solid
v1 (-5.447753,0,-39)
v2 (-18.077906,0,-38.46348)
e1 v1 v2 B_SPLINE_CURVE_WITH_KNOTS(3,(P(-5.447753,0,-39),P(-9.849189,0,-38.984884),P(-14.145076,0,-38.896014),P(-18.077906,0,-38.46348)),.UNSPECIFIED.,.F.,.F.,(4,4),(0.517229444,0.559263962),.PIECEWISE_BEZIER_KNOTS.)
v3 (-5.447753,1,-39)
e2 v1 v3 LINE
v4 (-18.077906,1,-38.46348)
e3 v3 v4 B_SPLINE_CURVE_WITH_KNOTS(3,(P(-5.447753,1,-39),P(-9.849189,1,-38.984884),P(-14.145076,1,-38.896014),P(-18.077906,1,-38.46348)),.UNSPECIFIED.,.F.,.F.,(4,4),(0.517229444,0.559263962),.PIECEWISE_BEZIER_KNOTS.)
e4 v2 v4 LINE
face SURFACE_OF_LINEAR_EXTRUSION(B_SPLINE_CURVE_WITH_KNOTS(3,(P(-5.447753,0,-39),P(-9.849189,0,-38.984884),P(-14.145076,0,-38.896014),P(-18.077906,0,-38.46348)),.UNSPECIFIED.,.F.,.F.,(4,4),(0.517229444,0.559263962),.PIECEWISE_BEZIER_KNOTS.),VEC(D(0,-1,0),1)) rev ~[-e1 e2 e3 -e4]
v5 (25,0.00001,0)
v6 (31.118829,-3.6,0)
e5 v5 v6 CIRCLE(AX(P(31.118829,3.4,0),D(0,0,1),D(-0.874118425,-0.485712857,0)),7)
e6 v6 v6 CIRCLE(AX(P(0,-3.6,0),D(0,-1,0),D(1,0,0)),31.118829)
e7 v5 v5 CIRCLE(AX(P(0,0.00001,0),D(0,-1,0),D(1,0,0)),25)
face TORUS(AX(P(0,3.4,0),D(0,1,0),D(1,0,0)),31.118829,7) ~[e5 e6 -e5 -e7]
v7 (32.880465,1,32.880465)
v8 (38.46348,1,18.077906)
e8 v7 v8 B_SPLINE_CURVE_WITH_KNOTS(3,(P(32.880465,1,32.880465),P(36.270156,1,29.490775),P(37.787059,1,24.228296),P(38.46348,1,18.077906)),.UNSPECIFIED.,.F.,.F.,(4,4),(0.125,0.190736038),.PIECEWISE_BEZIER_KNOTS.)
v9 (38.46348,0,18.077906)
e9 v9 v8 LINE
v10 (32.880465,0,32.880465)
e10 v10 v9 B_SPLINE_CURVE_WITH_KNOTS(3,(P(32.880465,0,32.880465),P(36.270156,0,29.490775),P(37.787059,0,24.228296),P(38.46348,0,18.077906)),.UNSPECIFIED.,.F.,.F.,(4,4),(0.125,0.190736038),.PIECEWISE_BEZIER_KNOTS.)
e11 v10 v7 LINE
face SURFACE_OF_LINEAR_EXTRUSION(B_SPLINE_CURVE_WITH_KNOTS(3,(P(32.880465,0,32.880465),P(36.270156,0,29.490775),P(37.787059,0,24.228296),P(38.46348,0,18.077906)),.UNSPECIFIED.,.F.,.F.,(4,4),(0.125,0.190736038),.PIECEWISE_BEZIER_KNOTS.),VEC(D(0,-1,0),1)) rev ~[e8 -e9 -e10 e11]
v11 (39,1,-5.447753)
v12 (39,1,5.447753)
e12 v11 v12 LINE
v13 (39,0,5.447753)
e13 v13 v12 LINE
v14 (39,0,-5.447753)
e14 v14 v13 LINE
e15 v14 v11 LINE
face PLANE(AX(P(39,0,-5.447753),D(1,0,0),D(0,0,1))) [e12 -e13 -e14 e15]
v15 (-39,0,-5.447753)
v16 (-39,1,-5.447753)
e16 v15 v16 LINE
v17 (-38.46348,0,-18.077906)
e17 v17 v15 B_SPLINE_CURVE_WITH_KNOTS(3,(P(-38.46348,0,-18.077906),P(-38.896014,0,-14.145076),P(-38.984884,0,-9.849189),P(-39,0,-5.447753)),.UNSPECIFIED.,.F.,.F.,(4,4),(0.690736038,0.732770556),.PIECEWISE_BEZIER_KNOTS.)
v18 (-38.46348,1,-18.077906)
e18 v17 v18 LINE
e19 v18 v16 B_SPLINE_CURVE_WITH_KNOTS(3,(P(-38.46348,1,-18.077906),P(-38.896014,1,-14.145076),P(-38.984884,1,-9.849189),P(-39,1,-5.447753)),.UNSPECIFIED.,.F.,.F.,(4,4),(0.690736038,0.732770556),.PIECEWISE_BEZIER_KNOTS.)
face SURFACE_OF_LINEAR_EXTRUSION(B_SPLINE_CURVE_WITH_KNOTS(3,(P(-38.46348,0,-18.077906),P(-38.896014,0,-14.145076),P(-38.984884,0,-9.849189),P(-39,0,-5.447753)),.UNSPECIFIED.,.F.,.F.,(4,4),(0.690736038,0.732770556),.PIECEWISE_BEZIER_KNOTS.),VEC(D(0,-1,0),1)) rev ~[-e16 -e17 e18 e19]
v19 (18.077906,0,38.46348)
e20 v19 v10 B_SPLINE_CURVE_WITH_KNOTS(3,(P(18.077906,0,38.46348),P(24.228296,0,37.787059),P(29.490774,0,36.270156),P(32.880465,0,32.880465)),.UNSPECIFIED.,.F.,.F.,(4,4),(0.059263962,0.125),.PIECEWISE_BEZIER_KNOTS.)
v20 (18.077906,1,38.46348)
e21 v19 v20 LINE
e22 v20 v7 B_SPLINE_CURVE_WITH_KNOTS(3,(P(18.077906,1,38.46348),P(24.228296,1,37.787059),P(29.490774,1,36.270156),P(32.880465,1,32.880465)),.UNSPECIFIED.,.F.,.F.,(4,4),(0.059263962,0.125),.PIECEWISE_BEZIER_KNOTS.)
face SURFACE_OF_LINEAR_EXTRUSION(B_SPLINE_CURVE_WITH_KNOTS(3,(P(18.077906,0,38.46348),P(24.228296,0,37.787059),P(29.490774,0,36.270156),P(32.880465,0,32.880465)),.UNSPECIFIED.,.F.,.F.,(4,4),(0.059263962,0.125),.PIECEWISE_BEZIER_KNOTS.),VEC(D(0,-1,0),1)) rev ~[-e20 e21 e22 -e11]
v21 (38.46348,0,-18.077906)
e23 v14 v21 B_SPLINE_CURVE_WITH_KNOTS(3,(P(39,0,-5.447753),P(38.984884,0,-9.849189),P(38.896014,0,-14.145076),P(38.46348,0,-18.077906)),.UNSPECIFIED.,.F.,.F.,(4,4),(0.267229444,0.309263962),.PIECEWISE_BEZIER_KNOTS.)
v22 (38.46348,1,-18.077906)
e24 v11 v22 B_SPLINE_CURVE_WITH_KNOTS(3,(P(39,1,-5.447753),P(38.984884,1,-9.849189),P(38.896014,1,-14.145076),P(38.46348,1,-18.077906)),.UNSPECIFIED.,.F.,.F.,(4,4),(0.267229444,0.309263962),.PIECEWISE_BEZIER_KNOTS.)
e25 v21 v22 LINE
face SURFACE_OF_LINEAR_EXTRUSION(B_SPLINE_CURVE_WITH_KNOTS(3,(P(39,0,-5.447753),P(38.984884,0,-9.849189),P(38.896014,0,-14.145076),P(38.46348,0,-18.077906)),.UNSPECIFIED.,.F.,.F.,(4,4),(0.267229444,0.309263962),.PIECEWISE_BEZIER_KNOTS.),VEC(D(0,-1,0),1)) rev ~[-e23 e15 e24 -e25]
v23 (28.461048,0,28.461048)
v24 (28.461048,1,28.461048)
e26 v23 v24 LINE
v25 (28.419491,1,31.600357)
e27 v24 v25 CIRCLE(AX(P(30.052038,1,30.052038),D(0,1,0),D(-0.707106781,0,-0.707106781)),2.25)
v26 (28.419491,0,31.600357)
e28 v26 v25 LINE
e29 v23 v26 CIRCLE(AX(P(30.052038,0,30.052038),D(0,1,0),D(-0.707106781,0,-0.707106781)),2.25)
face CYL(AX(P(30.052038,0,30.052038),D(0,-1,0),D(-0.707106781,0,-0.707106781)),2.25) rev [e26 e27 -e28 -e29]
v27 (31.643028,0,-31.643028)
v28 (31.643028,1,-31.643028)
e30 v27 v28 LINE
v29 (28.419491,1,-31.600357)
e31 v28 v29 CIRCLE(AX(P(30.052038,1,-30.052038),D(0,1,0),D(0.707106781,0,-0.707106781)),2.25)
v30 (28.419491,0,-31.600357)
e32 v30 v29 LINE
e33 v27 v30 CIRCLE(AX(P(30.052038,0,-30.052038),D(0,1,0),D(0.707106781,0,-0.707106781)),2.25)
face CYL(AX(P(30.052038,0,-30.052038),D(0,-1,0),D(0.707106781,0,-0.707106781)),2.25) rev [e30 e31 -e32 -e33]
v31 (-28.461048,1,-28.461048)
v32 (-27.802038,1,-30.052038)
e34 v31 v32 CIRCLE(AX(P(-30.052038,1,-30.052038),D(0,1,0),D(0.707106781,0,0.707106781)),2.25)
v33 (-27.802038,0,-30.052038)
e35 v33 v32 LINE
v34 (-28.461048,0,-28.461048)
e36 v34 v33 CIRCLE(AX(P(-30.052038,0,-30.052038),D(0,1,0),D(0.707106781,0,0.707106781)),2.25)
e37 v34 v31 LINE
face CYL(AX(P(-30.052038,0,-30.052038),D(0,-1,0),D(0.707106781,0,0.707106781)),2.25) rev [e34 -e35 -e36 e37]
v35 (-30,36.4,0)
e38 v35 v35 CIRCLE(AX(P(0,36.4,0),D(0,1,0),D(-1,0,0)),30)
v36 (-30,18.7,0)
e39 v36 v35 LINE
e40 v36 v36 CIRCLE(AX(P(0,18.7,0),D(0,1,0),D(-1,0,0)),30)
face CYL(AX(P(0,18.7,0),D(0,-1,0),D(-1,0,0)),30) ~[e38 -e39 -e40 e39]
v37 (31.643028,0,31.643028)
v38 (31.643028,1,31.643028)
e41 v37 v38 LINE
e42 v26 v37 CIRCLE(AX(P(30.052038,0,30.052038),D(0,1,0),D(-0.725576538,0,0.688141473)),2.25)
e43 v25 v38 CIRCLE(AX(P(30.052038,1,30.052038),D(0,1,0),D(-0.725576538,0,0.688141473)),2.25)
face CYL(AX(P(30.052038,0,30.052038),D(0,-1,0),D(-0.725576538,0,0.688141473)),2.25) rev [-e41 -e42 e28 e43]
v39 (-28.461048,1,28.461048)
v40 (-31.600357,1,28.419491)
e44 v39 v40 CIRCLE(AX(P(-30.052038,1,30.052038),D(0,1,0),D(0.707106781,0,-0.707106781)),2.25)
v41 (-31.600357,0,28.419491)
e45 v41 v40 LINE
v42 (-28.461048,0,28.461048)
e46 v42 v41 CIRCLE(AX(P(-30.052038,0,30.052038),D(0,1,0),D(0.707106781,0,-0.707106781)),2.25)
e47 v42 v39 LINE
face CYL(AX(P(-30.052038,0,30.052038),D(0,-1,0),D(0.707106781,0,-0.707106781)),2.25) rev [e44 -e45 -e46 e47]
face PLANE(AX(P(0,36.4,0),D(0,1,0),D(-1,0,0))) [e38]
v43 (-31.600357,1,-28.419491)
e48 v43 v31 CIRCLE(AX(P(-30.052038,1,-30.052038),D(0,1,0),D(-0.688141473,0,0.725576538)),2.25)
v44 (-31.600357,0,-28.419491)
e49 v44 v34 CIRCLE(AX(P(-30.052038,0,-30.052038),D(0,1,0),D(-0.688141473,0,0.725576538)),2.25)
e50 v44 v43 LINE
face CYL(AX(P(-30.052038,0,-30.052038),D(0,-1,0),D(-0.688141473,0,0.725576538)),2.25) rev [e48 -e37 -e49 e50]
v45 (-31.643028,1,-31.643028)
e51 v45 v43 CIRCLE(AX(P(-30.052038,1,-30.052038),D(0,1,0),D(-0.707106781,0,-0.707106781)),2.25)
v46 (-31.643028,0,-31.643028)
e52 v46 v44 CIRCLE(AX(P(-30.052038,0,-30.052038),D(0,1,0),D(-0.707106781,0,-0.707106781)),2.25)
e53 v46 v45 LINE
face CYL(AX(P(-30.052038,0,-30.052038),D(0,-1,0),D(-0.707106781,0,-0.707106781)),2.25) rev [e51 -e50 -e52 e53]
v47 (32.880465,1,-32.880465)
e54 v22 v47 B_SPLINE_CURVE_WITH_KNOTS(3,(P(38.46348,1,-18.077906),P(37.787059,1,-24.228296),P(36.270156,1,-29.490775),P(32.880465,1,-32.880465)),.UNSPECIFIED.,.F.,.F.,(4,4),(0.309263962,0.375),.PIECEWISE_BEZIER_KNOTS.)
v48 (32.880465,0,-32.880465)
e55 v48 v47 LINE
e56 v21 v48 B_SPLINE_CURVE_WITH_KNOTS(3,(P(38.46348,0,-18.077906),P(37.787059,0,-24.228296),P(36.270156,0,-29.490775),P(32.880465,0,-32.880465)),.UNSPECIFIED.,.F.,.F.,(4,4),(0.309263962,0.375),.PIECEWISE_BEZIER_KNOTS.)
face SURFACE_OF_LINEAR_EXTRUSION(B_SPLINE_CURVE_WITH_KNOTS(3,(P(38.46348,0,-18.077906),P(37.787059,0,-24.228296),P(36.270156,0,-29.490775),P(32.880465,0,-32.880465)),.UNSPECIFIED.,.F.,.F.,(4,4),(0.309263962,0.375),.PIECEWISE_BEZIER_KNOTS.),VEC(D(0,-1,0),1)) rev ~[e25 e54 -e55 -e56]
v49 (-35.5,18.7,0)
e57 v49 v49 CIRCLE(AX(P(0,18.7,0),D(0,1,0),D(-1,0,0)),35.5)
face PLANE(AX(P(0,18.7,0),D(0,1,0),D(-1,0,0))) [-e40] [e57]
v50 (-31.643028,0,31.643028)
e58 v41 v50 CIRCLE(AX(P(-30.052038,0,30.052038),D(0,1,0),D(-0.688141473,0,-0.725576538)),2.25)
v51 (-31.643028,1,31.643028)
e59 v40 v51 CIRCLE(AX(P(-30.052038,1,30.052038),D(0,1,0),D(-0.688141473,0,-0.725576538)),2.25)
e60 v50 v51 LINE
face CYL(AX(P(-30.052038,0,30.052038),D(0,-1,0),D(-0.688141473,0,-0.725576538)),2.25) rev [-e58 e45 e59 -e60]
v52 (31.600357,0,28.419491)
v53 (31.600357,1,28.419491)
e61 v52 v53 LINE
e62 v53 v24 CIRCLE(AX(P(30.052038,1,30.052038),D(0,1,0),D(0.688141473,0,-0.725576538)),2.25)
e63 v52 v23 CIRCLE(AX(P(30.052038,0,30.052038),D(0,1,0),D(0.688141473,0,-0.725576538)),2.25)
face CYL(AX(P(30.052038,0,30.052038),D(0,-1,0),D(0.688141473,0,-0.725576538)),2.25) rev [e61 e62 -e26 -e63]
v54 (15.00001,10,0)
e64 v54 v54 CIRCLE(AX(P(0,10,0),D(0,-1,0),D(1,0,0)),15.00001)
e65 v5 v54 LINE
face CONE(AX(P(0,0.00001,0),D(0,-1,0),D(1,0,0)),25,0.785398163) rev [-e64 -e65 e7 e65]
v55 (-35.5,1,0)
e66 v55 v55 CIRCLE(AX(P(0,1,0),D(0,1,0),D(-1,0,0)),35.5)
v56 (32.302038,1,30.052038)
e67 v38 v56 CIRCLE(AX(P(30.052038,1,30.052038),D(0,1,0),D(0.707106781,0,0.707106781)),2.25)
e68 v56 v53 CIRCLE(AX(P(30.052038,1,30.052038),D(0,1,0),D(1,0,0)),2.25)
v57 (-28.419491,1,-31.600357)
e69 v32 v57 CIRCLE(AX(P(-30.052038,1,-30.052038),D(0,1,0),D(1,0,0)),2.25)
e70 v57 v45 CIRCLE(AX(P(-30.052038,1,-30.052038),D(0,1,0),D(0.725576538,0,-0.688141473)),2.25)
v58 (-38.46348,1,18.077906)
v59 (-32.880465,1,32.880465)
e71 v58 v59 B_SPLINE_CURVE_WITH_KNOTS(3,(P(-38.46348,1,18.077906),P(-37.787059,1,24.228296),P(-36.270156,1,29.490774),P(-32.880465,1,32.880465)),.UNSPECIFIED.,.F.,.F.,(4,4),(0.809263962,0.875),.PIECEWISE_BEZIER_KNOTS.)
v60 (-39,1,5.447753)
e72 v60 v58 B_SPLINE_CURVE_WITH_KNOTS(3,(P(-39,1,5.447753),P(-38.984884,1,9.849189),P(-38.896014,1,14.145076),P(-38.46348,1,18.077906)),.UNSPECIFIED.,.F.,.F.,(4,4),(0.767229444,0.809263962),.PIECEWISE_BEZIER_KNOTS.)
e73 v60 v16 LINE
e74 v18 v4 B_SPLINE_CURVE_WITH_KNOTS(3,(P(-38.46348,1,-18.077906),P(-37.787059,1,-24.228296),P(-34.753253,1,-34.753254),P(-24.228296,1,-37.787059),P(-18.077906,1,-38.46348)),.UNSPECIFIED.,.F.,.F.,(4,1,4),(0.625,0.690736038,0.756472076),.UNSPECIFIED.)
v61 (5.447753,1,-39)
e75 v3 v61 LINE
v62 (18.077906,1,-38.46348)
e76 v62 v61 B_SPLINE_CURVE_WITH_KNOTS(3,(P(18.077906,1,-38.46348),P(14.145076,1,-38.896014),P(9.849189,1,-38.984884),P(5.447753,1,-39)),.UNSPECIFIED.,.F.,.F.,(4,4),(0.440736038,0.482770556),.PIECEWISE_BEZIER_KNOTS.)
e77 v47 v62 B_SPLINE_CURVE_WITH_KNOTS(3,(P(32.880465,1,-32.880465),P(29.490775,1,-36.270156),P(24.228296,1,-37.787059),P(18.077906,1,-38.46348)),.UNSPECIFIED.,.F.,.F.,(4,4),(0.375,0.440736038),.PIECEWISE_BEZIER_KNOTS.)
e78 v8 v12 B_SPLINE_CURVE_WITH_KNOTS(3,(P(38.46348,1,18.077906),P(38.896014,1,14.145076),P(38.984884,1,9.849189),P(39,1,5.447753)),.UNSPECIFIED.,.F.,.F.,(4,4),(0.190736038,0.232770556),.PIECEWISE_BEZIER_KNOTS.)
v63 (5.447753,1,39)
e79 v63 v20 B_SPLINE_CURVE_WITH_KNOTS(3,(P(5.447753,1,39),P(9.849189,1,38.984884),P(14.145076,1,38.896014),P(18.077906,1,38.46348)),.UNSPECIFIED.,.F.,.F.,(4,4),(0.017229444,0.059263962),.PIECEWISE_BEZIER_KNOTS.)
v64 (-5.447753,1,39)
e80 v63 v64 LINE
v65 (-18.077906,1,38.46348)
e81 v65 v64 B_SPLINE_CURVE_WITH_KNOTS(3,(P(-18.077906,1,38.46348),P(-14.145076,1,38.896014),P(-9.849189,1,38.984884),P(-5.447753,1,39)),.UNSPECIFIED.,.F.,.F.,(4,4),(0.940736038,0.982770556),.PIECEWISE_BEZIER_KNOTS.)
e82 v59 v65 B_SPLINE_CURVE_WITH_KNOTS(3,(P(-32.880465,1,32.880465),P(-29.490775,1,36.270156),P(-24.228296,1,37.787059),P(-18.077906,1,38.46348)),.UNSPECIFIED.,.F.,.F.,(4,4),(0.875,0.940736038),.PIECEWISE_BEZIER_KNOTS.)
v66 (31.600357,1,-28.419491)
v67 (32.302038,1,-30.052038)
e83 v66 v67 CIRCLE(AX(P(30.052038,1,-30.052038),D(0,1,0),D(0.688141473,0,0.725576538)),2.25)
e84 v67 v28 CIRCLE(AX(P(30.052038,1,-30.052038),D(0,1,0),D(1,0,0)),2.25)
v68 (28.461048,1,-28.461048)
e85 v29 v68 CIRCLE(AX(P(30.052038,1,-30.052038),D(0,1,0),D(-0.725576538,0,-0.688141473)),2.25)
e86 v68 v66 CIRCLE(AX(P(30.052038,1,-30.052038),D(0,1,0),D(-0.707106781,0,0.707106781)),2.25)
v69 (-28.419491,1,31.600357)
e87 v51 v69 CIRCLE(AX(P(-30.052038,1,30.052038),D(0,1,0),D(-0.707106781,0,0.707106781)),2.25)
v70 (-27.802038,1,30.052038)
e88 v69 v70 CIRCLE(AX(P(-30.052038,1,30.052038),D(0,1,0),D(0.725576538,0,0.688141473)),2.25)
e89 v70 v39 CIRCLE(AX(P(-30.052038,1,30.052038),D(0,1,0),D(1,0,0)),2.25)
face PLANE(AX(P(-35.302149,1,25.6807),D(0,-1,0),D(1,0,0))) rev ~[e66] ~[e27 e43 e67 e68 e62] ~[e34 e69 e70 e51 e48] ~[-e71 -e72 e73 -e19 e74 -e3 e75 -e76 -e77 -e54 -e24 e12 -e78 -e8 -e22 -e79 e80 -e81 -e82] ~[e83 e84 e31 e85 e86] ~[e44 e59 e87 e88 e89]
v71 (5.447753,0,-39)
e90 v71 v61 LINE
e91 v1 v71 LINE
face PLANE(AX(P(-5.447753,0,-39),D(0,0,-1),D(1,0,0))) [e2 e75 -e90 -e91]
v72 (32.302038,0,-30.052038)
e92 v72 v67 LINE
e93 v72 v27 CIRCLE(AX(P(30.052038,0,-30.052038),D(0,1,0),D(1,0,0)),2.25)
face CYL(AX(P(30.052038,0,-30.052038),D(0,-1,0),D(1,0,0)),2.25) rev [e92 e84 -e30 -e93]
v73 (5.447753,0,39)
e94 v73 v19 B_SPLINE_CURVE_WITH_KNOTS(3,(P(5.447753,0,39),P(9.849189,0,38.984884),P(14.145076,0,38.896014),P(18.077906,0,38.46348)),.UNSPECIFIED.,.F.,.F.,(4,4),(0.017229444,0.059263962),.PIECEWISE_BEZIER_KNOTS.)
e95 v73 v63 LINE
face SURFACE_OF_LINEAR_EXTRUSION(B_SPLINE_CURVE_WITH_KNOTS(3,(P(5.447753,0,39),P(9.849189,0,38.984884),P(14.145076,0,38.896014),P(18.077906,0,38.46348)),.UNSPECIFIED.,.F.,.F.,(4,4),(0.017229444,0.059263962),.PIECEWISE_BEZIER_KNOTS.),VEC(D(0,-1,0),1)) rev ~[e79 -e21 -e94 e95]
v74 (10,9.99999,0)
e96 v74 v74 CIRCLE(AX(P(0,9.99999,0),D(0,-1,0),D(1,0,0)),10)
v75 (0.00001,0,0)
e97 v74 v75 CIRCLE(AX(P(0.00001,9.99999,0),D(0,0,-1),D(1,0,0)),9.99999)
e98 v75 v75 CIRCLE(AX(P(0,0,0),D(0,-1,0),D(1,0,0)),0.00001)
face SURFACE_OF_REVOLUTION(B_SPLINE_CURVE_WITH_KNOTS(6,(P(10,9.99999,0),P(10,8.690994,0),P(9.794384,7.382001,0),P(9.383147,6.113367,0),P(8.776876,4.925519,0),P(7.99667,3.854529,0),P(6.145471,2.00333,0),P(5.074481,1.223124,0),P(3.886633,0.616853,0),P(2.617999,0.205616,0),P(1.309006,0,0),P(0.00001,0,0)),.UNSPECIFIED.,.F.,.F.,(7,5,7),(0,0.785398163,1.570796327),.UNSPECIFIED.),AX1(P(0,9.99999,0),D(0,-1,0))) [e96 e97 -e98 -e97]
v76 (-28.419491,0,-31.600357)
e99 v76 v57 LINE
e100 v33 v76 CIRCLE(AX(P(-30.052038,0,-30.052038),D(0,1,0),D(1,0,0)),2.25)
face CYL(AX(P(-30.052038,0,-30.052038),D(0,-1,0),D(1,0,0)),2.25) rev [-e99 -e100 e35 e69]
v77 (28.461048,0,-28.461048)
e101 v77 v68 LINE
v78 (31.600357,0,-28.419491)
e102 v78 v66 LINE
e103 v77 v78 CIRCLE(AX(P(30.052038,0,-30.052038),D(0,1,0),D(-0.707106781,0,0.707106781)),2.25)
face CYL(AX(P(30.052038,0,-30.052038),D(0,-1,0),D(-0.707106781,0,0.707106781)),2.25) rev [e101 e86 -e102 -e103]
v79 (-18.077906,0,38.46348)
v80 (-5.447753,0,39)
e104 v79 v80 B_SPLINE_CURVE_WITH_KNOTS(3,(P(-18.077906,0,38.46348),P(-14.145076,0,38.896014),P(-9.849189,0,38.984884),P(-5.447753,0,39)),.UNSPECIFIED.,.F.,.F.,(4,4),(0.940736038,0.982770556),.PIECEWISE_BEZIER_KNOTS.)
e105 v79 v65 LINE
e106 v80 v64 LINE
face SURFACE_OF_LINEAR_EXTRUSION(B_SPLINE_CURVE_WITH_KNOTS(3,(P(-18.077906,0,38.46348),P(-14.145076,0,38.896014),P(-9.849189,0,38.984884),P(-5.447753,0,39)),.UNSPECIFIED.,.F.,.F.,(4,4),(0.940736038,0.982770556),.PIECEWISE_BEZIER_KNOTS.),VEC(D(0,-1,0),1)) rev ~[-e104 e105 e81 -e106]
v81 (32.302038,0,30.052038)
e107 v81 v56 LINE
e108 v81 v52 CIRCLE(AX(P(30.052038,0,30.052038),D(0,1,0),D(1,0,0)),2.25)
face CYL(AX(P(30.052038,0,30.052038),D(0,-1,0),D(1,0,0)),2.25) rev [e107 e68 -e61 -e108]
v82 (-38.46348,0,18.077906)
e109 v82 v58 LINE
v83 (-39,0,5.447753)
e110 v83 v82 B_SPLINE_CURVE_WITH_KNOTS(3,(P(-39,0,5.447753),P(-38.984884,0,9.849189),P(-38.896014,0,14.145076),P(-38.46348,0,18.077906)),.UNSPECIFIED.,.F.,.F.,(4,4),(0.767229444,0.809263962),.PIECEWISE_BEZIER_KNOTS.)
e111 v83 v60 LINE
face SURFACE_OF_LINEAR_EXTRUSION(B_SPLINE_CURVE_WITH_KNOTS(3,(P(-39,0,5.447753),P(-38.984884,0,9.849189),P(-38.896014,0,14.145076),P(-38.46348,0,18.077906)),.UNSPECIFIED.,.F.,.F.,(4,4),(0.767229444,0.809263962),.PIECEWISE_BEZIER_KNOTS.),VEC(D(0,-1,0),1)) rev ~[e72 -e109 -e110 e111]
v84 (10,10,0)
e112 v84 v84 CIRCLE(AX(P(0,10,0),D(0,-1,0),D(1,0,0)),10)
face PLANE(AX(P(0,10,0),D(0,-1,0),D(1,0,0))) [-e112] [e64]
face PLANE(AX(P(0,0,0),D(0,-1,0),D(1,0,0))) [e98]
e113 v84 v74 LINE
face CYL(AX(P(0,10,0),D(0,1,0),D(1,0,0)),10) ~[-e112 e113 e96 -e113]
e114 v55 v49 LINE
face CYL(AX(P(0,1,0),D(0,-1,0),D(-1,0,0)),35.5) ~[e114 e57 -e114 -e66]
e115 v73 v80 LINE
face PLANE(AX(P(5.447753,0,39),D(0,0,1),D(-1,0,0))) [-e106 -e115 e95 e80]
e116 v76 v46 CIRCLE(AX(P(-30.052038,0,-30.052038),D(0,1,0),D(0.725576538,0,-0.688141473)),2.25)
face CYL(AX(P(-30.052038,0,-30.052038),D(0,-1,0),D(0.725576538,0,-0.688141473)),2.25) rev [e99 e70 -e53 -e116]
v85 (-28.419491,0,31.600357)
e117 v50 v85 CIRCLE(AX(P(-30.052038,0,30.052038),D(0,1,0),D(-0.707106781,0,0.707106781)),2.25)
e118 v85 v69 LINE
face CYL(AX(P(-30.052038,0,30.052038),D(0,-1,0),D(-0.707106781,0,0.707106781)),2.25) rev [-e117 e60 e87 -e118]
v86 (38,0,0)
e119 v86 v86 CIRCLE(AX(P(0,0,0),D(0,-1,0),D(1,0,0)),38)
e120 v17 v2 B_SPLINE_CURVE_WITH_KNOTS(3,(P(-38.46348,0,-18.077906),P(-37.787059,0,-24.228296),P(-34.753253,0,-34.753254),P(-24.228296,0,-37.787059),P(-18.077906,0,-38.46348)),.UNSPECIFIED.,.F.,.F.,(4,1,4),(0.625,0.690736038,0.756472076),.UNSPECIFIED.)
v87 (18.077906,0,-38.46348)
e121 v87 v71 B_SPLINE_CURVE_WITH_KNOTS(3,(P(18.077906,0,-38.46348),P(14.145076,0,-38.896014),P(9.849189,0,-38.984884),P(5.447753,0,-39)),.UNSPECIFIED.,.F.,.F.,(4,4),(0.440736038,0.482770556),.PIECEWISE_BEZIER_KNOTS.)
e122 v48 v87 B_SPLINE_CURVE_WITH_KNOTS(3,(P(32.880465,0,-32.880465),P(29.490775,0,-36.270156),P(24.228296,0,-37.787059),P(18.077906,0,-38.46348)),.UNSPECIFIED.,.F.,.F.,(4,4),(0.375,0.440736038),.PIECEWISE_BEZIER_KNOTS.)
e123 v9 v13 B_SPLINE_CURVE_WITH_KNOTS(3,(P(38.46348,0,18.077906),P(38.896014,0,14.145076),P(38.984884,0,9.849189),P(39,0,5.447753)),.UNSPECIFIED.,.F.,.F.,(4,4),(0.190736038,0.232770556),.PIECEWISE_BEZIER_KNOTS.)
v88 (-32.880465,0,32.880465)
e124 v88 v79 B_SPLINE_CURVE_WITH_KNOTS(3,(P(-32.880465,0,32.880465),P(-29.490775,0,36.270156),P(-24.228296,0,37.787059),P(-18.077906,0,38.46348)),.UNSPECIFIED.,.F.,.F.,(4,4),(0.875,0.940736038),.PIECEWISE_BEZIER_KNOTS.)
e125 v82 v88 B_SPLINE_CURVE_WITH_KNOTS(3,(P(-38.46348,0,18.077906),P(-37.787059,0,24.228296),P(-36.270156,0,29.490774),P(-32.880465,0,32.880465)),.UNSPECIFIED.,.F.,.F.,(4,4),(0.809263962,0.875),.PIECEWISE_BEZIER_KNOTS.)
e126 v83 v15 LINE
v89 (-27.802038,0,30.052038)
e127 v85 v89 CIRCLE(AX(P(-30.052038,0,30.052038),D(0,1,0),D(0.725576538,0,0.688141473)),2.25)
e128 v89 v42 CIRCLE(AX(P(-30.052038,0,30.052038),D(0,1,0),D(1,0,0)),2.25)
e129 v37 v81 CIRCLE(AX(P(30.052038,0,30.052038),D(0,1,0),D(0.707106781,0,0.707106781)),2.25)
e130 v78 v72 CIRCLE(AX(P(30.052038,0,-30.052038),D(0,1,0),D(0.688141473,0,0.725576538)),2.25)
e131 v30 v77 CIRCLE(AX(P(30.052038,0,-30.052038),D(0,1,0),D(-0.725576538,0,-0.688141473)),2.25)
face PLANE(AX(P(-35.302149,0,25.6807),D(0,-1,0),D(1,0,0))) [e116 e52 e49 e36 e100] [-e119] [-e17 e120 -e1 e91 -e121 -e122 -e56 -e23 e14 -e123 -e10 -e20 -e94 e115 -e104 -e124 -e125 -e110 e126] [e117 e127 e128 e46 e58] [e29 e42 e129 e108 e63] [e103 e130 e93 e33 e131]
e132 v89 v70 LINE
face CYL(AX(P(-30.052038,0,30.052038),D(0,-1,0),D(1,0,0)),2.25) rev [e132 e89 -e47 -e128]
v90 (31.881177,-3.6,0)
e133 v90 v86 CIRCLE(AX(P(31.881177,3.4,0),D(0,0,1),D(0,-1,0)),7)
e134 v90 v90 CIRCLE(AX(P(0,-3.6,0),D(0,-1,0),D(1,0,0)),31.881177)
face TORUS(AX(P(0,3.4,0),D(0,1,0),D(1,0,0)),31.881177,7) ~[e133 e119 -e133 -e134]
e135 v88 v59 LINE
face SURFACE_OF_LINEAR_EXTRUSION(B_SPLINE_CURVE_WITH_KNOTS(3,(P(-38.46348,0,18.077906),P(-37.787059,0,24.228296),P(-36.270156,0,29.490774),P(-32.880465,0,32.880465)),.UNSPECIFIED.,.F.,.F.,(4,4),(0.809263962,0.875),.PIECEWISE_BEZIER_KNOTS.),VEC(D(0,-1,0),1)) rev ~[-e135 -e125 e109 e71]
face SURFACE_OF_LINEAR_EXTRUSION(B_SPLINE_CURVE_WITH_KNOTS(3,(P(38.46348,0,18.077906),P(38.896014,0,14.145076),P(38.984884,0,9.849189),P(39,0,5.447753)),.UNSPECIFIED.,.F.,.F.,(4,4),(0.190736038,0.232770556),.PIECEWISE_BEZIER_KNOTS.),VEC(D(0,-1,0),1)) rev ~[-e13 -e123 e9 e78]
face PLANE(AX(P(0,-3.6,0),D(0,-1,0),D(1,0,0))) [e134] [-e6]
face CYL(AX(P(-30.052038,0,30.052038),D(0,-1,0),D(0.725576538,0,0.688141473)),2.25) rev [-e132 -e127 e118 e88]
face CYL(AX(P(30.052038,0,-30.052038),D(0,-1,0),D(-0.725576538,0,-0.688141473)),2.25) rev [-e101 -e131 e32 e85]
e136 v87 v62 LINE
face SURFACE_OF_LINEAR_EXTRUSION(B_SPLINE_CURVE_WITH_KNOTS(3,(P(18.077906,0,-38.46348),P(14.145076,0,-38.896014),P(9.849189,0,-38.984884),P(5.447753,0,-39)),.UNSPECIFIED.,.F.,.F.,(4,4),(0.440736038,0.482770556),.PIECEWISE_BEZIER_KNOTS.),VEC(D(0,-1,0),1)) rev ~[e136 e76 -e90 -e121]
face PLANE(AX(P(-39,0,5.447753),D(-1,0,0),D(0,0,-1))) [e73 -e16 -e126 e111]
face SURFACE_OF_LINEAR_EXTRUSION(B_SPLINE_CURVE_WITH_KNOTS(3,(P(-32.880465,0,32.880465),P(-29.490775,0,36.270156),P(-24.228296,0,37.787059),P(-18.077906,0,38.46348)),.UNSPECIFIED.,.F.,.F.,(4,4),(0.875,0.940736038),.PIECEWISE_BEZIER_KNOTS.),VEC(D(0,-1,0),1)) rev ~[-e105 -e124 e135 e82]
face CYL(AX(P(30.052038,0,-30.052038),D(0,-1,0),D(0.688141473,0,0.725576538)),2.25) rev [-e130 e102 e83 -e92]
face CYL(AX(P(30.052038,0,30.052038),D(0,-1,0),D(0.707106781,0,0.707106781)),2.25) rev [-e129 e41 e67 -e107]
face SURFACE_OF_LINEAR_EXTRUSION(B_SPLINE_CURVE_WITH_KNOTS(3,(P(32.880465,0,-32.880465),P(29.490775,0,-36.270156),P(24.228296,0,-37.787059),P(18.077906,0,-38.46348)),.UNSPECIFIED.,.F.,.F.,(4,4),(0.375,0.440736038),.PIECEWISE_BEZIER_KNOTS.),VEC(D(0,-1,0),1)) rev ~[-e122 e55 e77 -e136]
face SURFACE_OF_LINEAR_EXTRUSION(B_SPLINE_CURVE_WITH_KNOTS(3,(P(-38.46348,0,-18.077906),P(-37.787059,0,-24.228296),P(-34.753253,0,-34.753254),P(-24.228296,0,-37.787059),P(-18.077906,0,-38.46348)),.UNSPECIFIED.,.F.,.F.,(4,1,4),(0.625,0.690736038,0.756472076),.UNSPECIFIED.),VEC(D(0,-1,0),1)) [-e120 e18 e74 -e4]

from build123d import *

# Parameters (mm, degrees)
F1_DEPTH  = 1
F2_R      = 35.5
F3_DEPTH  = 17.7
F4_R      = 30
F5_DEPTH  = 17.7
F6_R      = 25
F7_DEPTH  = 10
F8_R      = 10
F9_DEPTH  = 10
F10_R     = 9.99999
F11_R     = 38
F11_R_2   = 25
F12_DEPTH = 3.6
F13_SIZE  = 9.99999


# Not quite as in the source:
# - a fillet or chamfer that OpenCascade refuses, or shapes differently, is made with other operations: its cross-section is extruded or revolved along the edge and cut away or added
# - a fillet or chamfer is up to 0.001 mm smaller than in the source, because OpenCascade refuses the exact size
# - ends of sketch curves that miss each other by under 0.0002 mm in the source are joined


with BuildPart() as f1:
    # F0 (on Front) → F1 (new body)
    with BuildSketch(Plane.XZ):
        with BuildLine():
            Line((-31.6430284581, 31.6430284581), (-32.8804653252, 32.8804653252))
            add(Edge.make_bspline(
                [(-38.4634802867, 18.0779059693), (-37.7870588122, 24.2282956212), (-36.2701561309, 29.4907744999), (-32.8804653607, 32.8804652897)],
                knots=[0.809263962, 0.809263962, 0.809263962, 0.809263962, 0.875, 0.875, 0.875, 0.875], degree=3))
            ThreePointArc((-38.4634802867, 18.0779059693), (-35.411472746, 23.5005871833), (-31.6003565153, 28.4194909895))
            ThreePointArc((-31.6003565153, 28.4194909895), (-32.3018410876, 30.0222561796), (-31.6430284581, 31.6430284581))
        make_face()
        with BuildLine():
            add(Edge.make_bspline(
                [(-32.8804653607, 32.8804652897), (-29.4907745634, 36.2701561065), (-24.2282956474, 37.7870588046), (-18.077905986, 38.4634802832)],
                knots=[0.875, 0.875, 0.875, 0.875, 0.940736038, 0.940736038, 0.940736038, 0.940736038], degree=3))
            Line((-32.8804653252, 32.8804653252), (-31.6430284581, 31.6430284581))
            ThreePointArc((-31.6430284581, 31.6430284581), (-30.0222561796, 32.3018410876), (-28.4194909895, 31.6003565153))
            ThreePointArc((-28.4194909895, 31.6003565153), (-23.5005871834, 35.411472746), (-18.0779059693, 38.4634802867))
        make_face()
        with BuildLine():
            add(Edge.make_bspline(
                [(-38.4634802867, -18.0779059693), (-38.8960139665, -14.1450759683), (-38.9848843926, -9.8491893154), (-39, -5.4477534527)],
                knots=[0.690736038, 0.690736038, 0.690736038, 0.690736038, 0.7327705557, 0.7327705557, 0.7327705557, 0.7327705557], degree=3))
            ThreePointArc((-38.4634802867, -18.0779059693), (-35.411472746, -23.5005871834), (-31.6003565153, -28.4194909895))
            ThreePointArc((-31.6003565153, -28.4194909895), (-30.0222561796, -27.8022353132), (-28.4610479428, -28.4610479428))
            Line((-28.4610479428, -28.4610479428), (0, 0))
            Line((0, 0), (-28.4610479428, 28.4610479428))
            ThreePointArc((-28.4610479428, 28.4610479428), (-30.0222561796, 27.8022353132), (-31.6003565153, 28.4194909895))
            ThreePointArc((-31.6003565153, 28.4194909895), (-35.411472746, 23.5005871833), (-38.4634802867, 18.0779059693))
            add(Edge.make_bspline(
                [(-39, 5.4477534527), (-38.9848843926, 9.8491893154), (-38.8960139665, 14.1450759683), (-38.4634802867, 18.0779059693)],
                knots=[0.7672294443, 0.7672294443, 0.7672294443, 0.7672294443, 0.809263962, 0.809263962, 0.809263962, 0.809263962], degree=3))
            Line((-39, 5.4477534527), (-39, -2.257e-07))
            Line((-39, -2.257e-07), (-39, -5.4477534527))
        make_face()
        with BuildLine():
            ThreePointArc((28.4194909895, 31.6003565153), (23.5005871834, 35.411472746), (18.0779059693, 38.4634802867))
            add(Edge.make_bspline(
                [(5.4477534527, 39), (9.8491893154, 38.9848843926), (14.1450759683, 38.8960139665), (18.0779059693, 38.4634802867)],
                knots=[0.0172294443, 0.0172294443, 0.0172294443, 0.0172294443, 0.059263962, 0.059263962, 0.059263962, 0.059263962], degree=3))
            Line((5.4477534527, 39), (0, 39))
            Line((0, 39), (-5.4477534527, 39))
            add(Edge.make_bspline(
                [(-18.0779059693, 38.4634802867), (-14.1450759684, 38.8960139665), (-9.8491893154, 38.9848843926), (-5.4477534527, 39)],
                knots=[0.940736038, 0.940736038, 0.940736038, 0.940736038, 0.9827705557, 0.9827705557, 0.9827705557, 0.9827705557], degree=3))
            ThreePointArc((-18.0779059693, 38.4634802867), (-23.5005871834, 35.411472746), (-28.4194909895, 31.6003565153))
            ThreePointArc((-28.4194909895, 31.6003565153), (-27.9620942748, 30.885485492), (-27.8020382004, 30.0520382004))
            ThreePointArc((-27.8020382004, 30.0520382004), (-27.9733092523, 29.1910004776), (-28.4610479428, 28.4610479428))
            Line((-28.4610479428, 28.4610479428), (0, 0))
            Line((0, 0), (28.4610479428, 28.4610479428))
            ThreePointArc((28.4610479428, 28.4610479428), (27.8022353132, 30.0222561796), (28.4194909895, 31.6003565153))
        make_face()
        with BuildLine():
            ThreePointArc((31.6003565153, -28.4194909895), (35.411472746, -23.5005871834), (38.4634802867, -18.0779059693))
            add(Edge.make_bspline(
                [(39, -5.4477534527), (38.9848843926, -9.8491893154), (38.8960139665, -14.1450759683), (38.4634802867, -18.0779059693)],
                knots=[0.2672294443, 0.2672294443, 0.2672294443, 0.2672294443, 0.309263962, 0.309263962, 0.309263962, 0.309263962], degree=3))
            Line((39, -5.4477534527), (39, 6.014e-07))
            Line((39, 6.014e-07), (39, 5.4477534527))
            add(Edge.make_bspline(
                [(38.4634802867, 18.0779059693), (38.8960139665, 14.1450759683), (38.9848843926, 9.8491893154), (39, 5.4477534527)],
                knots=[0.190736038, 0.190736038, 0.190736038, 0.190736038, 0.2327705557, 0.2327705557, 0.2327705557, 0.2327705557], degree=3))
            ThreePointArc((38.4634802867, 18.0779059693), (35.411472746, 23.5005871834), (31.6003565153, 28.4194909895))
            ThreePointArc((31.6003565153, 28.4194909895), (30.0222561796, 27.8022353132), (28.4610479428, 28.4610479428))
            Line((28.4610479428, 28.4610479428), (0, 0))
            Line((0, 0), (28.4610479428, -28.4610479428))
            ThreePointArc((28.4610479428, -28.4610479428), (30.0222561796, -27.8022353132), (31.6003565153, -28.4194909895))
        make_face()
        with BuildLine():
            add(Edge.make_bspline(
                [(18.0779059693, -38.4634802867), (14.1450759683, -38.8960139665), (9.8491893154, -38.9848843926), (5.4477534527, -39)],
                knots=[0.440736038, 0.440736038, 0.440736038, 0.440736038, 0.4827705557, 0.4827705557, 0.4827705557, 0.4827705557], degree=3))
            ThreePointArc((18.0779059693, -38.4634802867), (23.5005871834, -35.411472746), (28.4194909895, -31.6003565153))
            ThreePointArc((28.4194909895, -31.6003565153), (27.8022353132, -30.0222561796), (28.4610479428, -28.4610479428))
            Line((28.4610479428, -28.4610479428), (0, 0))
            Line((0, 0), (-28.4610479428, -28.4610479428))
            ThreePointArc((-28.4610479428, -28.4610479428), (-27.9733092523, -29.1910004776), (-27.8020382004, -30.0520382004))
            ThreePointArc((-27.8020382004, -30.0520382004), (-27.9620942748, -30.885485492), (-28.4194909895, -31.6003565153))
            ThreePointArc((-28.4194909895, -31.6003565153), (-23.5005871834, -35.411472746), (-18.0779059693, -38.4634802867))
            add(Edge.make_bspline(
                [(-5.4477534527, -39), (-9.8491893154, -38.9848843926), (-14.1450759683, -38.8960139665), (-18.0779059693, -38.4634802867)],
                knots=[0.5172294443, 0.5172294443, 0.5172294443, 0.5172294443, 0.559263962, 0.559263962, 0.559263962, 0.559263962], degree=3))
            Line((-5.4477534527, -39), (-6.496e-07, -39))
            Line((-6.496e-07, -39), (5.4477534527, -39))
        make_face()
        with BuildLine():
            add(Edge.make_bspline(
                [(32.8804653252, -32.8804653252), (29.4907745274, -36.2701561229), (24.2282956212, -37.7870588122), (18.0779059693, -38.4634802867)],
                knots=[0.375, 0.375, 0.375, 0.375, 0.440736038, 0.440736038, 0.440736038, 0.440736038], degree=3))
            Line((32.8804653252, -32.8804653252), (31.6430284581, -31.6430284581))
            ThreePointArc((31.6430284581, -31.6430284581), (30.0222561796, -32.3018410876), (28.4194909895, -31.6003565153))
            ThreePointArc((28.4194909895, -31.6003565153), (23.5005871834, -35.411472746), (18.0779059693, -38.4634802867))
        make_face()
        with BuildLine():
            Line((31.6430284581, -31.6430284581), (32.8804653252, -32.8804653252))
            add(Edge.make_bspline(
                [(38.4634802867, -18.0779059693), (37.7870588122, -24.2282956212), (36.2701561229, -29.4907745274), (32.8804653252, -32.8804653252)],
                knots=[0.309263962, 0.309263962, 0.309263962, 0.309263962, 0.375, 0.375, 0.375, 0.375], degree=3))
            ThreePointArc((38.4634802867, -18.0779059693), (35.411472746, -23.5005871834), (31.6003565153, -28.4194909895))
            ThreePointArc((31.6003565153, -28.4194909895), (32.1191879541, -29.1635609099), (32.3020382004, -30.0520382004))
            ThreePointArc((32.3020382004, -30.0520382004), (32.1307671486, -30.9130759232), (31.6430284581, -31.6430284581))
        make_face()
        with BuildLine():
            Line((-31.6430284581, -31.6430284581), (-32.8804653252, -32.8804653252))
            add(Edge.make_bspline(
                [(-18.0779059693, -38.4634802867), (-24.2282956212, -37.7870588122), (-29.4907744533, -36.2701561443), (-32.8804653252, -32.8804653252)],
                knots=[0.559263962, 0.559263962, 0.559263962, 0.559263962, 0.625, 0.625, 0.625, 0.625], degree=3))
            ThreePointArc((-18.0779059693, -38.4634802867), (-23.5005871834, -35.411472746), (-28.4194909895, -31.6003565153))
            ThreePointArc((-28.4194909895, -31.6003565153), (-30.0222561796, -32.3018410876), (-31.6430284581, -31.6430284581))
        make_face()
        with BuildLine():
            add(Edge.make_bspline(
                [(-32.8804652296, -32.8804654207), (-36.2701560789, -29.4907746242), (-37.7870587922, -24.2282957051), (-38.4634802779, -18.0779060371)],
                knots=[0.625, 0.625, 0.625, 0.625, 0.690736038, 0.690736038, 0.690736038, 0.690736038], degree=3))
            Line((-32.8804652296, -32.8804654207), (-31.6430284581, -31.6430284581))
            ThreePointArc((-31.6430284581, -31.6430284581), (-32.3018410876, -30.0222561796), (-31.6003565153, -28.4194909895))
            ThreePointArc((-31.6003565153, -28.4194909895), (-35.411472746, -23.5005871834), (-38.4634802779, -18.0779060371))
        make_face()
        with BuildLine():
            Line((31.6430284581, 31.6430284581), (32.8804653252, 32.8804653252))
            add(Edge.make_bspline(
                [(18.0779059693, 38.4634802867), (24.2282956212, 37.7870588122), (29.4907744654, 36.2701561408), (32.8804653252, 32.8804653252)],
                knots=[0.059263962, 0.059263962, 0.059263962, 0.059263962, 0.125, 0.125, 0.125, 0.125], degree=3))
            ThreePointArc((18.0779059693, 38.4634802867), (23.5005871834, 35.411472746), (28.4194909895, 31.6003565153))
            ThreePointArc((28.4194909895, 31.6003565153), (30.0222561796, 32.3018410876), (31.6430284581, 31.6430284581))
        make_face()
        with BuildLine():
            add(Edge.make_bspline(
                [(32.8804652452, 32.8804654051), (36.2701560861, 29.4907746085), (37.7870587955, 24.2282956914), (38.4634802794, 18.077906026)],
                knots=[0.125, 0.125, 0.125, 0.125, 0.190736038, 0.190736038, 0.190736038, 0.190736038], degree=3))
            Line((32.8804652452, 32.8804654051), (31.6430284581, 31.6430284581))
            ThreePointArc((31.6430284581, 31.6430284581), (32.1307671486, 30.9130759232), (32.3020382004, 30.0520382004))
            ThreePointArc((32.3020382004, 30.0520382004), (32.1191879541, 29.1635609099), (31.6003565153, 28.4194909895))
            ThreePointArc((31.6003565153, 28.4194909895), (35.411472746, 23.5005871834), (38.4634802794, 18.077906026))
        make_face()
    extrude(amount=-F1_DEPTH)

    # F2 (on face) → F3 (join)
    with BuildSketch(Plane(origin=(0, 1, 0), x_dir=(-1, 0, 0), z_dir=(0, 1, 0))):
        Circle(F2_R)
    extrude(amount=F3_DEPTH)

    # F4 (on face) → F5 (join)
    with BuildSketch(Plane(origin=(0, 18.7, 0), x_dir=(-1, 0, 0), z_dir=(0, 1, 0))):
        Circle(F4_R)
    extrude(amount=F5_DEPTH)

    # F6 (on face) → F7 (cut)
    with BuildSketch(Plane.XZ):
        Circle(F6_R)
    extrude(amount=-F7_DEPTH, mode=Mode.SUBTRACT)

    # F8 (on face) → F9 (join)
    with BuildSketch(Plane.XZ.offset(-10)):
        Circle(F8_R)
    extrude(amount=F9_DEPTH)

    # F10 (radius 10 in the source; OpenCascade refuses exactly that, so slightly less here)
    f10_edges = [f1.edges().sort_by_distance(p)[0] for p in [
        (-10, 0, 0),
    ]]
    fillet(f10_edges, radius=F10_R)

    # F11 (on face) → F12 (join)
    with BuildSketch(Plane.XZ):
        Circle(F11_R)
        Circle(F11_R_2, mode=Mode.SUBTRACT)
    extrude(amount=F12_DEPTH)

    # F13 (size 10 in the source; OpenCascade refuses exactly that, so slightly less here)
    f13_edges = [f1.edges().sort_by_distance(p)[0] for p in [
        (-25, 10, 0),
    ]]
    chamfer(f13_edges, length=F13_SIZE)

    # F14: fillet of radius 7 on 2 edges, made by hand

    # F14_s1 → F14_t2 (revolve, cut)
    with BuildSketch(Plane.XY):
        with BuildLine():
            ThreePointArc((31.8811765837, -3.6), (35.4308244535, -2.6332412516), (38, 0))
            Line((38, 0), (38.1223764683, -0.068))
            ThreePointArc((38.1223764683, -0.068), (38.14, -1.8), (38.14, -3.6))
            Line((38.14, -3.6), (38, -3.74))
            Line((38, -3.74), (31.8811765837, -3.74))
            Line((31.8811765837, -3.74), (31.8811765837, -3.6))
        make_face()
    revolve(axis=Axis((0, -3.6, 0), (0, -1, 0)), mode=Mode.SUBTRACT)

    # F14_s3 → F14_t4 (revolve, cut)
    with BuildSketch(Plane.XY):
        with BuildLine():
            ThreePointArc((25, 1e-05), (27.569176173, -2.633238351), (31.1188289729, -3.6))
            Line((31.1188289729, -3.6), (31.1188289729, -3.74))
            Line((31.1188289729, -3.74), (25, -3.74))
            Line((25, -3.74), (24.86, -3.6))
            ThreePointArc((24.86, -3.6), (24.86, -1.799995), (24.8776234205, -0.0679898))
            Line((24.8776234205, -0.0679898), (25, 1e-05))
        make_face()
    revolve(axis=Axis((0, -3.6, 0), (0, -1, 0)), mode=Mode.SUBTRACT)


solid = f1.part
